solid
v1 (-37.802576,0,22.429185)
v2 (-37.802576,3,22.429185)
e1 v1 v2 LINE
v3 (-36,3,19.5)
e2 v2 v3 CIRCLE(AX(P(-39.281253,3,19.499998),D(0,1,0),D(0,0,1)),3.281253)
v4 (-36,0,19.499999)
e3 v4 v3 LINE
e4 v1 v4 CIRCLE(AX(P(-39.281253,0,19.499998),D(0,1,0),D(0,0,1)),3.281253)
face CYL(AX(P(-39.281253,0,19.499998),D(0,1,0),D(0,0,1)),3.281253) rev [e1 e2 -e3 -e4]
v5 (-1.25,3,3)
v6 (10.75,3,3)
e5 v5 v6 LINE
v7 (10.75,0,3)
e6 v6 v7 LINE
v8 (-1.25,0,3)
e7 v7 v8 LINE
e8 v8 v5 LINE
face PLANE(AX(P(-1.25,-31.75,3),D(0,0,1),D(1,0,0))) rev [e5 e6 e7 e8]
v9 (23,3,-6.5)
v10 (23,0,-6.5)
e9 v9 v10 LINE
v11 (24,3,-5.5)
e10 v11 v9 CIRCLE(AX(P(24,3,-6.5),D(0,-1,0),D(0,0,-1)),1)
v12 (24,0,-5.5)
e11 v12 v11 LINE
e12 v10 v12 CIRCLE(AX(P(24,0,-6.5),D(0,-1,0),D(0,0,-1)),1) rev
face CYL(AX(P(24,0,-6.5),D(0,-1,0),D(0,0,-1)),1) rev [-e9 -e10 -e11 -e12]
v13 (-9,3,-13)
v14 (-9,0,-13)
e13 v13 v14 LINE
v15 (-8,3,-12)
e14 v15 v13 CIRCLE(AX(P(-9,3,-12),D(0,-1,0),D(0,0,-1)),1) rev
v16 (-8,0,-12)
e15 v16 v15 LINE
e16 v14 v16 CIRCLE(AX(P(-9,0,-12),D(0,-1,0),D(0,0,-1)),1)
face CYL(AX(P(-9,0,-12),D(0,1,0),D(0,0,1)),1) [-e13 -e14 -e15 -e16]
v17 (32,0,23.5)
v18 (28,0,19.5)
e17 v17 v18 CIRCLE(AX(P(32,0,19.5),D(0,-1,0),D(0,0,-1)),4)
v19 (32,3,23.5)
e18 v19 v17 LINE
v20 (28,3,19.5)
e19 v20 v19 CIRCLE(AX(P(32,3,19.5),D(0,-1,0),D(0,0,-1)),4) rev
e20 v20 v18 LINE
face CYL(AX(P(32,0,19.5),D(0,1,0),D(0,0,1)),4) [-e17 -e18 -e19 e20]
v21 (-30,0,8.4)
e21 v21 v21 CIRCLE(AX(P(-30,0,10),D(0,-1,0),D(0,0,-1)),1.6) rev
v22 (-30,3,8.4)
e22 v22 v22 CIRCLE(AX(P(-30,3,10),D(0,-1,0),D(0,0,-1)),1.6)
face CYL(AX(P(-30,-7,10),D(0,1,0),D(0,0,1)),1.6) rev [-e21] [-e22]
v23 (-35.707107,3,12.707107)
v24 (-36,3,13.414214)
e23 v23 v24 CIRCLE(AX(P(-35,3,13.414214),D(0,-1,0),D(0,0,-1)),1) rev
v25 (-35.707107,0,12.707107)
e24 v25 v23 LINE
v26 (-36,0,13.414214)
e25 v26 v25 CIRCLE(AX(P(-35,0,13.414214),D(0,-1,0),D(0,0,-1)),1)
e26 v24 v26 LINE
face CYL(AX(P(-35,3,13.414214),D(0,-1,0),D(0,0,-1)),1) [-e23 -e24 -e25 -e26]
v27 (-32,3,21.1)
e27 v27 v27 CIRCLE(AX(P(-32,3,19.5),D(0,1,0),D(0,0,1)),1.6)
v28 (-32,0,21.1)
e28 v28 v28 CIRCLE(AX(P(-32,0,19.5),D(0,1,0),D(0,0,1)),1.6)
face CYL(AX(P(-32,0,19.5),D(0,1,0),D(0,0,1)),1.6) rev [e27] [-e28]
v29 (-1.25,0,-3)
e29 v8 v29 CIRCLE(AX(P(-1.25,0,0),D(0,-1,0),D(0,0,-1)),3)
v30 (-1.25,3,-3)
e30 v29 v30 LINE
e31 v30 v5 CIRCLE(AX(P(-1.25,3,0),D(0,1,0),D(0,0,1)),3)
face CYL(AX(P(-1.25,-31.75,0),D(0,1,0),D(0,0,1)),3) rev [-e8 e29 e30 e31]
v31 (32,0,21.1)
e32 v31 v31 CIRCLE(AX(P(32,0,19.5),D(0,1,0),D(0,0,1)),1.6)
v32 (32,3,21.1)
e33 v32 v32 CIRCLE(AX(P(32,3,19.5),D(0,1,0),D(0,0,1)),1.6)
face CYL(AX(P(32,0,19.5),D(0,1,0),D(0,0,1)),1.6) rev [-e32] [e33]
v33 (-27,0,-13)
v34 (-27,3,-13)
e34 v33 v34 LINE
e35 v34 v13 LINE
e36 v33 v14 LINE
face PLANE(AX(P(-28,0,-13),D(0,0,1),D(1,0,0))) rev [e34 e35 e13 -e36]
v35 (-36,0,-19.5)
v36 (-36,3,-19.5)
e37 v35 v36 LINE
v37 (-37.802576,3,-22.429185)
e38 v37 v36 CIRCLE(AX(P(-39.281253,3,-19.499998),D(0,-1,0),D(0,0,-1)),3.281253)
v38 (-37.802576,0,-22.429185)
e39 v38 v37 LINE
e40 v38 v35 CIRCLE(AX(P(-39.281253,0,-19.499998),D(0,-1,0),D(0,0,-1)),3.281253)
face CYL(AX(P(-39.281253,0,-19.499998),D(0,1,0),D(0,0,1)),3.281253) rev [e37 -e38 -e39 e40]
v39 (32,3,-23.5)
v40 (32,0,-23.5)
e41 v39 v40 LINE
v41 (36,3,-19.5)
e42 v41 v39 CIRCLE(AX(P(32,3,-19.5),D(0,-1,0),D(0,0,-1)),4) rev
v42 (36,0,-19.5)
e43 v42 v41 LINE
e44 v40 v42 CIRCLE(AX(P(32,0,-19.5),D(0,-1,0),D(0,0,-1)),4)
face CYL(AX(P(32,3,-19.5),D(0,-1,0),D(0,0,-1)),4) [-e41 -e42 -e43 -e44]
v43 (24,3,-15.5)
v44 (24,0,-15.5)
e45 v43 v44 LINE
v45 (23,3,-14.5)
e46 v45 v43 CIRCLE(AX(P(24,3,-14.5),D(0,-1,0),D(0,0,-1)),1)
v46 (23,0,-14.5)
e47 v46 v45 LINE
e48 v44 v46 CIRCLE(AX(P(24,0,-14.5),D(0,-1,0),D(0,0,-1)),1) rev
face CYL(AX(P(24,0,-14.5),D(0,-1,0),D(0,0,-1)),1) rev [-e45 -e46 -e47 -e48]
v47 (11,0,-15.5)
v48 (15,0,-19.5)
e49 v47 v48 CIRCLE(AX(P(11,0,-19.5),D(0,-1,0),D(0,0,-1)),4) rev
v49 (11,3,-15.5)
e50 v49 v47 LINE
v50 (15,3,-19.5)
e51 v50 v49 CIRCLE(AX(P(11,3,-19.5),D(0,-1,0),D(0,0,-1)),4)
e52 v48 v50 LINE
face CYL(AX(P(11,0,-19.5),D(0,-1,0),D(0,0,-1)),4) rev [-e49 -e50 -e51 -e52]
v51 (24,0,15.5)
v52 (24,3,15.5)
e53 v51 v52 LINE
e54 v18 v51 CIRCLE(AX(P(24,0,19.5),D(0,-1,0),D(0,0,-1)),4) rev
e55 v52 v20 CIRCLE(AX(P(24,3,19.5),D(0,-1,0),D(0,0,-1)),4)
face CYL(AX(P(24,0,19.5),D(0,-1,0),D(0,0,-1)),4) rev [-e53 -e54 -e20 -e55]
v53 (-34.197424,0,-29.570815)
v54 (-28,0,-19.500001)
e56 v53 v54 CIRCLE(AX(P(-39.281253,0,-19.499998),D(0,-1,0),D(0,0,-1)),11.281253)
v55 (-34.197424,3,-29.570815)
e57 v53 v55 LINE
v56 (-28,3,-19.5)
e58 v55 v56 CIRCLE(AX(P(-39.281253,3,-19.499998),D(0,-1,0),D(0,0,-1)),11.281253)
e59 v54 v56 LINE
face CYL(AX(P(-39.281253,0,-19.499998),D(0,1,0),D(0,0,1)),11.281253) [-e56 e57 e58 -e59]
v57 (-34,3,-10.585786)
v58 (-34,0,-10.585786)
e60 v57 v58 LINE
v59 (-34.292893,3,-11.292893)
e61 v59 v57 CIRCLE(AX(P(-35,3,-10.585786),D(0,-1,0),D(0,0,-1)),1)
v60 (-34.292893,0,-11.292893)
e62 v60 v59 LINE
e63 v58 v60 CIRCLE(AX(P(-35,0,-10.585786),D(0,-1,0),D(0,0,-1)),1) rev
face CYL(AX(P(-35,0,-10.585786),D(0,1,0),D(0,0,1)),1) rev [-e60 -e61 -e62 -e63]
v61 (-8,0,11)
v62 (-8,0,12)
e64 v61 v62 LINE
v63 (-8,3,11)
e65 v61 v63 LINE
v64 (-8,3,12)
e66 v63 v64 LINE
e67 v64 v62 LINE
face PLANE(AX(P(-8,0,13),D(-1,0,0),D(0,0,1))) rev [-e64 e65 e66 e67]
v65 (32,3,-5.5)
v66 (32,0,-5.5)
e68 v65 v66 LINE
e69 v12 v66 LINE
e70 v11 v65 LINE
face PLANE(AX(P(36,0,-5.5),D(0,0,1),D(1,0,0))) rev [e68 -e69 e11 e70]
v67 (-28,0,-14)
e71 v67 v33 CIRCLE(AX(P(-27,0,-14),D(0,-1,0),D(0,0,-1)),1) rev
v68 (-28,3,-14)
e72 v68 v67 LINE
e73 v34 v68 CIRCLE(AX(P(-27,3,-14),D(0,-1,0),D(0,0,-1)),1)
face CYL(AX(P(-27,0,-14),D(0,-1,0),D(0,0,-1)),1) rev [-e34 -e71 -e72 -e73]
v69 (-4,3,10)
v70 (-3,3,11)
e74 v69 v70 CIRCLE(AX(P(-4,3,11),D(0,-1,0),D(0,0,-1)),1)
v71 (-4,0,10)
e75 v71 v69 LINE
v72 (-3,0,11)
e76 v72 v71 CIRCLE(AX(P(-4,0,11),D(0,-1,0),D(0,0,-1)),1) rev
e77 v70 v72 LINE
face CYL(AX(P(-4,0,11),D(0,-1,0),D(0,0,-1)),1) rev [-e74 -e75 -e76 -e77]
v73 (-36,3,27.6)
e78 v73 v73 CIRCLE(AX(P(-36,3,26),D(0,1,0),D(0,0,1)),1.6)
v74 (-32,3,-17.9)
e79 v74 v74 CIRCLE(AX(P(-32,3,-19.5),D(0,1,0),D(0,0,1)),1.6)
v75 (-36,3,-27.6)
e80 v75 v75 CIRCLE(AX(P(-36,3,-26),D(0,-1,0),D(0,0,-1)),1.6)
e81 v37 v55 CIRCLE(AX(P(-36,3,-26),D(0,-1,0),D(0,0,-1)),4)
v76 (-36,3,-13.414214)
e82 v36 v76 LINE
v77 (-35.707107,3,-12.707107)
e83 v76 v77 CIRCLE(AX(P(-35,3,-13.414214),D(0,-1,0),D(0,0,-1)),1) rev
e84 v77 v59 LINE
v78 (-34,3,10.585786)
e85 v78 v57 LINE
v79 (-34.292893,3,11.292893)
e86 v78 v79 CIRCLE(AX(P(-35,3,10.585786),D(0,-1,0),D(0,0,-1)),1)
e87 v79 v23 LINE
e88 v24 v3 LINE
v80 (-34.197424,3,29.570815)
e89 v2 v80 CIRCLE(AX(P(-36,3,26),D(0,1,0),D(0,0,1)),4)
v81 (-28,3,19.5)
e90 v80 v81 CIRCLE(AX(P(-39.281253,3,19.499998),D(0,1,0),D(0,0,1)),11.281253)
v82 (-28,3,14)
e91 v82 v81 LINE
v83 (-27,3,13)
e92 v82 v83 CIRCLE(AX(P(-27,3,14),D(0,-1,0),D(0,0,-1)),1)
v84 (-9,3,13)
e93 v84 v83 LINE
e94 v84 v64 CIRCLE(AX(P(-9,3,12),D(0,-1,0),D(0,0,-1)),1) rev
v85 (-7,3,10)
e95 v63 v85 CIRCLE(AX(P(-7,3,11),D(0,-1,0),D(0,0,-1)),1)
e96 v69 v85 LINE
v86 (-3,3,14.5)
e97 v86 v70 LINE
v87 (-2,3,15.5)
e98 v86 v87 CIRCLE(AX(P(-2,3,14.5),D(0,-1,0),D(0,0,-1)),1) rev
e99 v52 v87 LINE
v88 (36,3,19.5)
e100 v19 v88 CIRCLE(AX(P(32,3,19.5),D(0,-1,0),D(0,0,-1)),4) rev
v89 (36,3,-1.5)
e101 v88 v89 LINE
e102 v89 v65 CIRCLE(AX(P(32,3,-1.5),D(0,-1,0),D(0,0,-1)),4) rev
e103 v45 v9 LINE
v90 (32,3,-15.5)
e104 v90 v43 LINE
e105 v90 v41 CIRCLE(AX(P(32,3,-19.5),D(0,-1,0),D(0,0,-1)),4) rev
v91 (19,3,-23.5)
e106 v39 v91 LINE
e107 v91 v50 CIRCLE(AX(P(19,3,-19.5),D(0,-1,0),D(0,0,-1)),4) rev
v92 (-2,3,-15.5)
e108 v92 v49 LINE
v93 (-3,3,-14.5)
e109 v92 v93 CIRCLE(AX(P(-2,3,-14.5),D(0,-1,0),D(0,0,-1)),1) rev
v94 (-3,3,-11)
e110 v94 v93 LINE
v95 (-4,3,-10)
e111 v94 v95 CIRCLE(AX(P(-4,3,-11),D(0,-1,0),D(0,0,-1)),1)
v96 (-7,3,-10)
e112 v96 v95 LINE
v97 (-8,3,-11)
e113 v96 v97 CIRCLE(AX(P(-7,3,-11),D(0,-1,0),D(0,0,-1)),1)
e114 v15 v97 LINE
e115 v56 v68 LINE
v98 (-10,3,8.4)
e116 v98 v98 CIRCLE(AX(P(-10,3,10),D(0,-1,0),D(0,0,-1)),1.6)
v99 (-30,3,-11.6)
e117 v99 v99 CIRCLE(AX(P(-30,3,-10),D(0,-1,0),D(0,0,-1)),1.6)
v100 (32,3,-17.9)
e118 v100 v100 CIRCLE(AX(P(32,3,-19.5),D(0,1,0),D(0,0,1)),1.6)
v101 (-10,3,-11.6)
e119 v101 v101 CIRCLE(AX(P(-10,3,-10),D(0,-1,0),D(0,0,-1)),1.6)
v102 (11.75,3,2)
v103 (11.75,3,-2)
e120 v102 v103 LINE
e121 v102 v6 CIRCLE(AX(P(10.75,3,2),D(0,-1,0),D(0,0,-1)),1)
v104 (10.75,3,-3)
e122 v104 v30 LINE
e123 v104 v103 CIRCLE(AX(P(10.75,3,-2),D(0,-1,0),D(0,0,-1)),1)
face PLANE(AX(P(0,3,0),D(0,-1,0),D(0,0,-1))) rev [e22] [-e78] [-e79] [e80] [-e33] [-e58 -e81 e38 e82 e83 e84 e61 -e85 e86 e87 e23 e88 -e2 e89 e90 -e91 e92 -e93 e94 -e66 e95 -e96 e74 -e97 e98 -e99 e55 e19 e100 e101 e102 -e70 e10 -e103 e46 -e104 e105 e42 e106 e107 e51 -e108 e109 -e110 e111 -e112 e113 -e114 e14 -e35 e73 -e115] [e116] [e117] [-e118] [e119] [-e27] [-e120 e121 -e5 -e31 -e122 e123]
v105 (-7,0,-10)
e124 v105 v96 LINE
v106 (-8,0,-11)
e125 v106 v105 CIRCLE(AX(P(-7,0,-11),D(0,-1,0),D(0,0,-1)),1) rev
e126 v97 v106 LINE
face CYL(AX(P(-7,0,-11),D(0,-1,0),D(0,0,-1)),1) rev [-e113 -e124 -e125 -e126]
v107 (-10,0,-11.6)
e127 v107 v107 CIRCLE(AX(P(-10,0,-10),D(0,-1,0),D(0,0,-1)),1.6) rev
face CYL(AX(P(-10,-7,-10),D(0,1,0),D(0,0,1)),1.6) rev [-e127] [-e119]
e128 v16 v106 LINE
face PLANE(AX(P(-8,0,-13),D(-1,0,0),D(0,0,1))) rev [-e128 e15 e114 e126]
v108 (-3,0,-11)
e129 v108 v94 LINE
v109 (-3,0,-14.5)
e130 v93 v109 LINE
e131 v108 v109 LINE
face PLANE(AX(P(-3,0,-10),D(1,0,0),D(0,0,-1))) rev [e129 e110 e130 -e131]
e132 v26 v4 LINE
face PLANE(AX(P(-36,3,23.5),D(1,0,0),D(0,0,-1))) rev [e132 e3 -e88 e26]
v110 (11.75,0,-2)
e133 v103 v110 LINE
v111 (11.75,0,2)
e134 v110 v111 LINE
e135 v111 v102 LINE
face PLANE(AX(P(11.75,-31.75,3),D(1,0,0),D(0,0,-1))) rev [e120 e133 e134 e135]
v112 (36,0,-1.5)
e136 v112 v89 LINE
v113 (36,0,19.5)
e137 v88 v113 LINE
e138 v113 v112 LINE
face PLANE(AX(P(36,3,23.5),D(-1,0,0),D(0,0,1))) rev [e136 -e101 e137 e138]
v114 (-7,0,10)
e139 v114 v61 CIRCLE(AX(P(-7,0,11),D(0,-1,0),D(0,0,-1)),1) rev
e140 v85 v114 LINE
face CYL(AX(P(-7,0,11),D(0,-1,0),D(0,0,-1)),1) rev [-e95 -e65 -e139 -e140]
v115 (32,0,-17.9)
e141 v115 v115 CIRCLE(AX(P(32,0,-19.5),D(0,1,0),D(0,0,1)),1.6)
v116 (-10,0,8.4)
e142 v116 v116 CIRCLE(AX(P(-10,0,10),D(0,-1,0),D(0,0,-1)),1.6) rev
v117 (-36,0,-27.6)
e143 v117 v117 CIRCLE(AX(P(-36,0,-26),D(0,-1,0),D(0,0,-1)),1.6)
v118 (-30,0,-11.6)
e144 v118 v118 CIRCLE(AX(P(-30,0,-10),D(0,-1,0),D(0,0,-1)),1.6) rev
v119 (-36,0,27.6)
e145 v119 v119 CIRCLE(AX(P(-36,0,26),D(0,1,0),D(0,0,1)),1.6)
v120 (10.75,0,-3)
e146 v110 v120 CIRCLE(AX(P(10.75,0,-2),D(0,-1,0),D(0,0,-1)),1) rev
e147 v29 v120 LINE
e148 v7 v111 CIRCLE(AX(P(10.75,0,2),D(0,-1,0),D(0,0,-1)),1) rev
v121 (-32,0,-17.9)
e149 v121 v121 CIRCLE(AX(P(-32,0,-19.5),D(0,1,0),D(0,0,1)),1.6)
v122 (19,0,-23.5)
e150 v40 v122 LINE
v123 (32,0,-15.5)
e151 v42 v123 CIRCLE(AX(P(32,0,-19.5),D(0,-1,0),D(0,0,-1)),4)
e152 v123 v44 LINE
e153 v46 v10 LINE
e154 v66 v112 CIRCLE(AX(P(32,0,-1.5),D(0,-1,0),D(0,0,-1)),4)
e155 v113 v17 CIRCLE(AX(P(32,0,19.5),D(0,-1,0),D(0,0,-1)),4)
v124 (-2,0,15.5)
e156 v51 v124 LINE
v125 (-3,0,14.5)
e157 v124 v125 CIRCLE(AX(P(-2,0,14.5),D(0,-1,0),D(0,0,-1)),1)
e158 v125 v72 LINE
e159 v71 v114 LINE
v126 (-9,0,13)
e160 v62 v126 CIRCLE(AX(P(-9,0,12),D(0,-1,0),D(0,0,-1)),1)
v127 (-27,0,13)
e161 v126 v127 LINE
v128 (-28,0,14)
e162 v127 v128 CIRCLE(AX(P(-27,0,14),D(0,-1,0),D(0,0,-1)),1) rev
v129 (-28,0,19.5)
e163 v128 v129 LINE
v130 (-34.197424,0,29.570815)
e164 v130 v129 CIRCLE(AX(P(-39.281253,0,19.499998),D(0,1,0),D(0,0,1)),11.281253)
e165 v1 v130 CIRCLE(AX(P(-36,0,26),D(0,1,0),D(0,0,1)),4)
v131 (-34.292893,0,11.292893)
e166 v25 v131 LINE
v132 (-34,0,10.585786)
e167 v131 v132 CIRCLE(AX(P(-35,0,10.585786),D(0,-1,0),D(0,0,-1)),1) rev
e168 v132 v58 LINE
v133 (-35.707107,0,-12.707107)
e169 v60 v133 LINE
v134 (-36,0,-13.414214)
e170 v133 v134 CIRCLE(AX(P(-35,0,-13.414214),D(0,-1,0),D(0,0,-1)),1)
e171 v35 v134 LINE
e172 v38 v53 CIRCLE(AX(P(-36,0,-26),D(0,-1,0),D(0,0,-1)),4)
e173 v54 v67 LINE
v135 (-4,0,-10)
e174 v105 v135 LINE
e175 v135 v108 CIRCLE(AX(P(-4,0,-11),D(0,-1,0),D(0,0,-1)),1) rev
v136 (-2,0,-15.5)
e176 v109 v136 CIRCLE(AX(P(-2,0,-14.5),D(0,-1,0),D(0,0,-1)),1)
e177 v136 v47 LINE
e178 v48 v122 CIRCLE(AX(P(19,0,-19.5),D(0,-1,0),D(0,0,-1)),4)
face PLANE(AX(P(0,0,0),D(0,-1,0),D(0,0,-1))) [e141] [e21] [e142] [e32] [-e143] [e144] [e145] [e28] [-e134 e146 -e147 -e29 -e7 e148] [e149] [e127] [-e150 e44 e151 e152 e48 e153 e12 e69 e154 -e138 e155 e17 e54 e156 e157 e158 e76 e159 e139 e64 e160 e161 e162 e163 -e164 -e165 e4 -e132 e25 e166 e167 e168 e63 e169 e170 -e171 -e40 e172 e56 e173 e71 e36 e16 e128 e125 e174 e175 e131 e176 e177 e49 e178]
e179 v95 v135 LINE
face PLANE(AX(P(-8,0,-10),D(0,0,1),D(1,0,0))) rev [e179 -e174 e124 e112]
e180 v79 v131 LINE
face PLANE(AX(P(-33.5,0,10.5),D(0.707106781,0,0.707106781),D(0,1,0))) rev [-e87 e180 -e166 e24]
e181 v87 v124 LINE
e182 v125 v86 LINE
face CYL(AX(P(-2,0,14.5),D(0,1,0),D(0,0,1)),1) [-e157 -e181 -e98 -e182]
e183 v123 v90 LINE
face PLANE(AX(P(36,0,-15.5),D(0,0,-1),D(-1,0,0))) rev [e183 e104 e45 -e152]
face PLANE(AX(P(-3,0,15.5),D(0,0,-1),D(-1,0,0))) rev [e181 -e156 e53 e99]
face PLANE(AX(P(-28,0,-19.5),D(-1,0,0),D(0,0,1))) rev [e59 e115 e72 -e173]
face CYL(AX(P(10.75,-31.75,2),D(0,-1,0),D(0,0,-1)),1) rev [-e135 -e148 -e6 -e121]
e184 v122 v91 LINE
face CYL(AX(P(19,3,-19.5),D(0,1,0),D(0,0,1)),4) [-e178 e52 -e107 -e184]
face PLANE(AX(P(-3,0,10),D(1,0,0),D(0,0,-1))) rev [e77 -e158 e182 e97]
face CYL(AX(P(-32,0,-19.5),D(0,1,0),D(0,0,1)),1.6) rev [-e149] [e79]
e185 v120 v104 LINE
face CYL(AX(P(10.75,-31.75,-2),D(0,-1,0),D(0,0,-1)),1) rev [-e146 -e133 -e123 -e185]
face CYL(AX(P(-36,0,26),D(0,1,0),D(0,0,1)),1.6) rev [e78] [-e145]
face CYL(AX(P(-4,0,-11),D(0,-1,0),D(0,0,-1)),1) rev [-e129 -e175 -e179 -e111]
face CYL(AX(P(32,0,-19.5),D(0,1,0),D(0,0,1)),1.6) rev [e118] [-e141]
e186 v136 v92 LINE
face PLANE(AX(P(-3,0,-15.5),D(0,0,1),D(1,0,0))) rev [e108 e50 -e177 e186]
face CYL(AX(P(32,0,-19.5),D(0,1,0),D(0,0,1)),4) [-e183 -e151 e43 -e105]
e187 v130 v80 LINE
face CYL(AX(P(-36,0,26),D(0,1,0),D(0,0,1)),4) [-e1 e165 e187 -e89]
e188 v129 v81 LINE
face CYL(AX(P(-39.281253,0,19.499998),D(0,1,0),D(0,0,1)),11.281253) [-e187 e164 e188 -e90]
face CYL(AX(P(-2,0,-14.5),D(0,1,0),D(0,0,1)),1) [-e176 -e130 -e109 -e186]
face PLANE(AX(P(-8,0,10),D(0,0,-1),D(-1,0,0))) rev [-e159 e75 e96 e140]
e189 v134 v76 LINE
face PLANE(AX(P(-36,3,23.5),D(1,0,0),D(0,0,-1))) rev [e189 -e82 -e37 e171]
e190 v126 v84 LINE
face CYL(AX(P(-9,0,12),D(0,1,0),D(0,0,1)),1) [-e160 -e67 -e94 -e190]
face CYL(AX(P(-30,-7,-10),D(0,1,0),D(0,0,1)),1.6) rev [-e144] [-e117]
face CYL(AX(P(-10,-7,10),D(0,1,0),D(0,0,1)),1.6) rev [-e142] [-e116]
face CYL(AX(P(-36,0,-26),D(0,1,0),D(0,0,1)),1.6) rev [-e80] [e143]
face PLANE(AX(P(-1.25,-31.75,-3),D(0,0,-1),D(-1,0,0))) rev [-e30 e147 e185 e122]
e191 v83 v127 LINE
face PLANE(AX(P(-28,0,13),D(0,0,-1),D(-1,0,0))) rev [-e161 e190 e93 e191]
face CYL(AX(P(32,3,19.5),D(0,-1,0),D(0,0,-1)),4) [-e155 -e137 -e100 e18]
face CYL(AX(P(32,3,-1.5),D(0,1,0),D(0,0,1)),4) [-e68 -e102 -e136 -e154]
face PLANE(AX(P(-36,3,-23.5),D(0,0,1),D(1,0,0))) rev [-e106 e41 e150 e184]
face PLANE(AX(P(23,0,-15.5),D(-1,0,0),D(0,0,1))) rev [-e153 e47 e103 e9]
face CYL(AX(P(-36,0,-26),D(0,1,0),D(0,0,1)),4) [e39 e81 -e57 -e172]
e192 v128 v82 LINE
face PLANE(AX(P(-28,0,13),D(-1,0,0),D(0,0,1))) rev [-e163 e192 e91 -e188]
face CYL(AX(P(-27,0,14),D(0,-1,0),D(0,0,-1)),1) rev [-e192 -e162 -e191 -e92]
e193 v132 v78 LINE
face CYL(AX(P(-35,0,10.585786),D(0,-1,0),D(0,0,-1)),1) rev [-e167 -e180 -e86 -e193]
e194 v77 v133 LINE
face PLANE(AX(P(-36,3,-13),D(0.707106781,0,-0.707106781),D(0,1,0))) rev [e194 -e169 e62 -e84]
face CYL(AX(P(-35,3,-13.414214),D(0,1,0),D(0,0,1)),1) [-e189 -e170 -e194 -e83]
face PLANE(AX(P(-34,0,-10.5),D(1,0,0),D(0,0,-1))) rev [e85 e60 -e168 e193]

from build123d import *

# Parameters (mm, degrees)
CROQUIS1_W              = 72
CROQUIS1_H              = 47
SALIENTE_EXTRUIR1_DEPTH = 3
CROQUIS3_W              = 13
CROQUIS3_H              = 10
CROQUIS3_W_2            = 2
CROQUIS3_H_2            = 21
CORTAR_EXTRUIR2_DEPTH   = 44.095823464
CROQUIS2_R              = 1.6
CORTAR_EXTRUIR1_DEPTH   = 44.095823464
CORTAR_EXTRUIR3_DEPTH   = 34.75
CROQUIS5_R              = 1.6
CORTAR_EXTRUIR7_DEPTH   = 10
CHAFL_N1_SIZE           = 2.5
REDONDEO2_R             = 1
CROQUIS6_R              = 1.6
SALIENTE_EXTRUIR2_DEPTH = 3
REDONDEO1_R             = 4


# Some blends are built 0.0001 mm under size
with BuildPart() as part:
    # Croquis1 → Saliente-Extruir1 (new body)
    with BuildSketch(Plane(origin=(0, 0, 0), x_dir=(1, 0, 0), z_dir=(0, 1, 0))):
        Rectangle(CROQUIS1_W, CROQUIS1_H)
    extrude(amount=SALIENTE_EXTRUIR1_DEPTH)

    # Croquis3 → Cortar-Extruir2 (cut, through all)
    with BuildSketch(Plane(origin=(0, 3, 0), x_dir=(1, 0, 0), z_dir=(0, 1, 0))):
        Polygon((-8, 13), (-8, 10), (-3, 10), (-3, 15.5), (15, 15.5), (15, 23.5), (-36, 23.5), (-36, 19.5), (-28, 19.5), (-28, 13), align=None)
        Polygon((-28, -13), (-8, -13), (-8, -10), (-3, -10), (-3, -15.5), (28, -15.5), (28, -23.5), (-36, -23.5), (-36, -19.5), (-28, -19.5), align=None)
        with Locations((29.5, 10.5)):
            Rectangle(CROQUIS3_W, CROQUIS3_H)
        with Locations((-35, 0)):
            Rectangle(CROQUIS3_W_2, CROQUIS3_H_2)
    extrude(amount=-CORTAR_EXTRUIR2_DEPTH, mode=Mode.SUBTRACT)

    # Croquis2 → Cortar-Extruir1 (cut, through all)
    with BuildSketch(Plane(origin=(0, 3, 0), x_dir=(1, 0, 0), z_dir=(0, 1, 0))):
        with Locations((-32, 19.5)):
            Circle(CROQUIS2_R)
        with Locations(Location((32, 19.5, 0), (0, 0, 270))):
            Circle(CROQUIS2_R)
        with Locations(Location((32, -19.5, 0), (0, 0, 270))):
            Circle(CROQUIS2_R)
        with Locations((-32, -19.5)):
            Circle(CROQUIS2_R)
    extrude(amount=-CORTAR_EXTRUIR1_DEPTH, mode=Mode.SUBTRACT)

    # Croquis4 → Cortar-Extruir3 (cut)
    with BuildSketch(Plane(origin=(0, 3, 0), x_dir=(1, 0, 0), z_dir=(0, 1, 0))):
        with BuildLine():
            Line((-1.25, -3), (11.75, -3))
            Line((11.75, -3), (11.75, 3))
            Line((11.75, 3), (-1.25, 3))
            ThreePointArc((-1.25, 3), (-4.25, 0), (-1.25, -3))
        make_face()
    extrude(amount=-CORTAR_EXTRUIR3_DEPTH, mode=Mode.SUBTRACT)

    # Croquis5 → Cortar-Extruir7 (cut)
    with BuildSketch(Plane(origin=(0, 3, -3), x_dir=(1, 0, 0), z_dir=(0, -1, 0))):
        with Locations(Location((-30, 13, 0), (0, 0, 270))):
            Circle(CROQUIS5_R)
        with Locations(Location((-30, -7, 0), (0, 0, 270))):
            Circle(CROQUIS5_R)
        with Locations(Location((-10, 13, 0), (0, 0, 270))):
            Circle(CROQUIS5_R)
        with Locations(Location((-10, -7, 0), (0, 0, 270))):
            Circle(CROQUIS5_R)
    extrude(amount=CORTAR_EXTRUIR7_DEPTH, mode=Mode.SUBTRACT)

    # Chaflán1
    # the kernel refuses this chamfer: 2.5 mm, written as the material it takes off along each edge
    with BuildSketch(Plane(origin=(-36, 9.42920747, 10.5), x_dir=(-0.0274958766105877, 0, 0.9996219169112968), z_dir=(0, -1, 0))) as chafl_n1_piece_1_section:
        Polygon((CHAFL_N1_SIZE * 0.999621916911, -CHAFL_N1_SIZE * 0.0274958766106), (-CHAFL_N1_SIZE * 0.0274958766106, -CHAFL_N1_SIZE * 0.999621916911), (0, 0), align=None)
    chafl_n1_piece_1 = extrude(amount=15.85841494, mode=Mode.PRIVATE)
    chafl_n1_piece_1 = split(chafl_n1_piece_1, bisect_by=Plane(origin=(-34, 1.5, 11.364296031), z_dir=(-1, 0, 0)), keep=Keep.TOP, mode=Mode.PRIVATE)
    add(chafl_n1_piece_1, mode=Mode.SUBTRACT)
    with BuildSketch(Plane(origin=(-36, 9.42920747, -10.5), x_dir=(0.9996219169112968, 0, 0.027495876610586282), z_dir=(0, -1, 0))) as chafl_n1_piece_2_section:
        Polygon((CHAFL_N1_SIZE * 0.999621916911, -CHAFL_N1_SIZE * 0.0274958766106), (-CHAFL_N1_SIZE * 0.0274958766106, -CHAFL_N1_SIZE * 0.999621916911), (0, 0), align=None)
    chafl_n1_piece_2 = extrude(amount=15.85841494, mode=Mode.PRIVATE)
    chafl_n1_piece_2 = split(chafl_n1_piece_2, bisect_by=Plane(origin=(-34, 1.5, -11.364296031), z_dir=(-1, 0, 0)), keep=Keep.TOP, mode=Mode.PRIVATE)
    add(chafl_n1_piece_2, mode=Mode.SUBTRACT)

    # Redondeo2
    redondeo2_edges = [part.edges().sort_by_distance(p)[0] for p in [
        (11.75, 1.5, -3),
        (11.75, 1.5, 3),
        (-36, 1.5, 13),
        (-36, 1.5, -13),
        (-34, 1.5, 11),
        (-34, 1.5, -11),
        (-8, 1.5, -13),
        (-28, 1.5, -13),
        (-3, 1.5, -15.5),
        (-3, 1.5, -10),
        (-8, 1.5, -10),
        (-28, 1.5, 13),
        (-8, 1.5, 13),
        (-8, 1.5, 10),
        (-3, 1.5, 10),
        (-3, 1.5, 15.5),
        (23, 1.5, -5.5),
        (23, 1.5, -15.5),
    ]]
    fillet(redondeo2_edges, radius=REDONDEO2_R)

    # Croquis6 → Saliente-Extruir2 (add, through all)
    with BuildSketch(Plane(origin=(0, 3, 0), x_dir=(1, 0, 0), z_dir=(0, 1, 0))):
        with BuildLine():
            ThreePointArc((-34.197424136, -29.570815068), (-29.673479987, -25.412473854), (-28, -19.500000848))
            ThreePointArc((-28, -19.500000848), (-31.999999152, -15.5), (-36, -19.499999152))
            ThreePointArc((-36, -19.499999152), (-36.48674652, -21.219694449), (-37.802575864, -22.429184932))
            ThreePointArc((-37.802575864, -22.429184932), (-39.570815068, -27.802575864), (-34.197424136, -29.570815068))
        make_face()
        with Locations(Location((-36, -26, 0), (0, 0, 270))):
            Circle(CROQUIS6_R, mode=Mode.SUBTRACT)
        with Locations(Location((-32, -19.5, 0), (0, 0, 270))):
            Circle(CROQUIS6_R, mode=Mode.SUBTRACT)
    saliente_extruir2 = extrude(amount=-SALIENTE_EXTRUIR2_DEPTH)

    # Simetría1: Saliente-Extruir2 across plane
    add(saliente_extruir2.mirror(Plane.XY))

    # Redondeo1
    redondeo1_edges = [part.edges().sort_by_distance(p)[0] for p in [
        (36, 1.5, -23.5),
        (36, 1.5, 23.5),
        (15, 1.5, -23.5),
        (15, 1.5, -15.5),
        (28, 1.5, 15.5),
        (36, 1.5, -5.5),
        (36, 1.5, -15.5),
        (28, 1.5, 23.5),
    ]]
    fillet(redondeo1_edges, radius=REDONDEO1_R - 0.0001)  # a hair under: the kernel refuses the full size


solid = part.part
